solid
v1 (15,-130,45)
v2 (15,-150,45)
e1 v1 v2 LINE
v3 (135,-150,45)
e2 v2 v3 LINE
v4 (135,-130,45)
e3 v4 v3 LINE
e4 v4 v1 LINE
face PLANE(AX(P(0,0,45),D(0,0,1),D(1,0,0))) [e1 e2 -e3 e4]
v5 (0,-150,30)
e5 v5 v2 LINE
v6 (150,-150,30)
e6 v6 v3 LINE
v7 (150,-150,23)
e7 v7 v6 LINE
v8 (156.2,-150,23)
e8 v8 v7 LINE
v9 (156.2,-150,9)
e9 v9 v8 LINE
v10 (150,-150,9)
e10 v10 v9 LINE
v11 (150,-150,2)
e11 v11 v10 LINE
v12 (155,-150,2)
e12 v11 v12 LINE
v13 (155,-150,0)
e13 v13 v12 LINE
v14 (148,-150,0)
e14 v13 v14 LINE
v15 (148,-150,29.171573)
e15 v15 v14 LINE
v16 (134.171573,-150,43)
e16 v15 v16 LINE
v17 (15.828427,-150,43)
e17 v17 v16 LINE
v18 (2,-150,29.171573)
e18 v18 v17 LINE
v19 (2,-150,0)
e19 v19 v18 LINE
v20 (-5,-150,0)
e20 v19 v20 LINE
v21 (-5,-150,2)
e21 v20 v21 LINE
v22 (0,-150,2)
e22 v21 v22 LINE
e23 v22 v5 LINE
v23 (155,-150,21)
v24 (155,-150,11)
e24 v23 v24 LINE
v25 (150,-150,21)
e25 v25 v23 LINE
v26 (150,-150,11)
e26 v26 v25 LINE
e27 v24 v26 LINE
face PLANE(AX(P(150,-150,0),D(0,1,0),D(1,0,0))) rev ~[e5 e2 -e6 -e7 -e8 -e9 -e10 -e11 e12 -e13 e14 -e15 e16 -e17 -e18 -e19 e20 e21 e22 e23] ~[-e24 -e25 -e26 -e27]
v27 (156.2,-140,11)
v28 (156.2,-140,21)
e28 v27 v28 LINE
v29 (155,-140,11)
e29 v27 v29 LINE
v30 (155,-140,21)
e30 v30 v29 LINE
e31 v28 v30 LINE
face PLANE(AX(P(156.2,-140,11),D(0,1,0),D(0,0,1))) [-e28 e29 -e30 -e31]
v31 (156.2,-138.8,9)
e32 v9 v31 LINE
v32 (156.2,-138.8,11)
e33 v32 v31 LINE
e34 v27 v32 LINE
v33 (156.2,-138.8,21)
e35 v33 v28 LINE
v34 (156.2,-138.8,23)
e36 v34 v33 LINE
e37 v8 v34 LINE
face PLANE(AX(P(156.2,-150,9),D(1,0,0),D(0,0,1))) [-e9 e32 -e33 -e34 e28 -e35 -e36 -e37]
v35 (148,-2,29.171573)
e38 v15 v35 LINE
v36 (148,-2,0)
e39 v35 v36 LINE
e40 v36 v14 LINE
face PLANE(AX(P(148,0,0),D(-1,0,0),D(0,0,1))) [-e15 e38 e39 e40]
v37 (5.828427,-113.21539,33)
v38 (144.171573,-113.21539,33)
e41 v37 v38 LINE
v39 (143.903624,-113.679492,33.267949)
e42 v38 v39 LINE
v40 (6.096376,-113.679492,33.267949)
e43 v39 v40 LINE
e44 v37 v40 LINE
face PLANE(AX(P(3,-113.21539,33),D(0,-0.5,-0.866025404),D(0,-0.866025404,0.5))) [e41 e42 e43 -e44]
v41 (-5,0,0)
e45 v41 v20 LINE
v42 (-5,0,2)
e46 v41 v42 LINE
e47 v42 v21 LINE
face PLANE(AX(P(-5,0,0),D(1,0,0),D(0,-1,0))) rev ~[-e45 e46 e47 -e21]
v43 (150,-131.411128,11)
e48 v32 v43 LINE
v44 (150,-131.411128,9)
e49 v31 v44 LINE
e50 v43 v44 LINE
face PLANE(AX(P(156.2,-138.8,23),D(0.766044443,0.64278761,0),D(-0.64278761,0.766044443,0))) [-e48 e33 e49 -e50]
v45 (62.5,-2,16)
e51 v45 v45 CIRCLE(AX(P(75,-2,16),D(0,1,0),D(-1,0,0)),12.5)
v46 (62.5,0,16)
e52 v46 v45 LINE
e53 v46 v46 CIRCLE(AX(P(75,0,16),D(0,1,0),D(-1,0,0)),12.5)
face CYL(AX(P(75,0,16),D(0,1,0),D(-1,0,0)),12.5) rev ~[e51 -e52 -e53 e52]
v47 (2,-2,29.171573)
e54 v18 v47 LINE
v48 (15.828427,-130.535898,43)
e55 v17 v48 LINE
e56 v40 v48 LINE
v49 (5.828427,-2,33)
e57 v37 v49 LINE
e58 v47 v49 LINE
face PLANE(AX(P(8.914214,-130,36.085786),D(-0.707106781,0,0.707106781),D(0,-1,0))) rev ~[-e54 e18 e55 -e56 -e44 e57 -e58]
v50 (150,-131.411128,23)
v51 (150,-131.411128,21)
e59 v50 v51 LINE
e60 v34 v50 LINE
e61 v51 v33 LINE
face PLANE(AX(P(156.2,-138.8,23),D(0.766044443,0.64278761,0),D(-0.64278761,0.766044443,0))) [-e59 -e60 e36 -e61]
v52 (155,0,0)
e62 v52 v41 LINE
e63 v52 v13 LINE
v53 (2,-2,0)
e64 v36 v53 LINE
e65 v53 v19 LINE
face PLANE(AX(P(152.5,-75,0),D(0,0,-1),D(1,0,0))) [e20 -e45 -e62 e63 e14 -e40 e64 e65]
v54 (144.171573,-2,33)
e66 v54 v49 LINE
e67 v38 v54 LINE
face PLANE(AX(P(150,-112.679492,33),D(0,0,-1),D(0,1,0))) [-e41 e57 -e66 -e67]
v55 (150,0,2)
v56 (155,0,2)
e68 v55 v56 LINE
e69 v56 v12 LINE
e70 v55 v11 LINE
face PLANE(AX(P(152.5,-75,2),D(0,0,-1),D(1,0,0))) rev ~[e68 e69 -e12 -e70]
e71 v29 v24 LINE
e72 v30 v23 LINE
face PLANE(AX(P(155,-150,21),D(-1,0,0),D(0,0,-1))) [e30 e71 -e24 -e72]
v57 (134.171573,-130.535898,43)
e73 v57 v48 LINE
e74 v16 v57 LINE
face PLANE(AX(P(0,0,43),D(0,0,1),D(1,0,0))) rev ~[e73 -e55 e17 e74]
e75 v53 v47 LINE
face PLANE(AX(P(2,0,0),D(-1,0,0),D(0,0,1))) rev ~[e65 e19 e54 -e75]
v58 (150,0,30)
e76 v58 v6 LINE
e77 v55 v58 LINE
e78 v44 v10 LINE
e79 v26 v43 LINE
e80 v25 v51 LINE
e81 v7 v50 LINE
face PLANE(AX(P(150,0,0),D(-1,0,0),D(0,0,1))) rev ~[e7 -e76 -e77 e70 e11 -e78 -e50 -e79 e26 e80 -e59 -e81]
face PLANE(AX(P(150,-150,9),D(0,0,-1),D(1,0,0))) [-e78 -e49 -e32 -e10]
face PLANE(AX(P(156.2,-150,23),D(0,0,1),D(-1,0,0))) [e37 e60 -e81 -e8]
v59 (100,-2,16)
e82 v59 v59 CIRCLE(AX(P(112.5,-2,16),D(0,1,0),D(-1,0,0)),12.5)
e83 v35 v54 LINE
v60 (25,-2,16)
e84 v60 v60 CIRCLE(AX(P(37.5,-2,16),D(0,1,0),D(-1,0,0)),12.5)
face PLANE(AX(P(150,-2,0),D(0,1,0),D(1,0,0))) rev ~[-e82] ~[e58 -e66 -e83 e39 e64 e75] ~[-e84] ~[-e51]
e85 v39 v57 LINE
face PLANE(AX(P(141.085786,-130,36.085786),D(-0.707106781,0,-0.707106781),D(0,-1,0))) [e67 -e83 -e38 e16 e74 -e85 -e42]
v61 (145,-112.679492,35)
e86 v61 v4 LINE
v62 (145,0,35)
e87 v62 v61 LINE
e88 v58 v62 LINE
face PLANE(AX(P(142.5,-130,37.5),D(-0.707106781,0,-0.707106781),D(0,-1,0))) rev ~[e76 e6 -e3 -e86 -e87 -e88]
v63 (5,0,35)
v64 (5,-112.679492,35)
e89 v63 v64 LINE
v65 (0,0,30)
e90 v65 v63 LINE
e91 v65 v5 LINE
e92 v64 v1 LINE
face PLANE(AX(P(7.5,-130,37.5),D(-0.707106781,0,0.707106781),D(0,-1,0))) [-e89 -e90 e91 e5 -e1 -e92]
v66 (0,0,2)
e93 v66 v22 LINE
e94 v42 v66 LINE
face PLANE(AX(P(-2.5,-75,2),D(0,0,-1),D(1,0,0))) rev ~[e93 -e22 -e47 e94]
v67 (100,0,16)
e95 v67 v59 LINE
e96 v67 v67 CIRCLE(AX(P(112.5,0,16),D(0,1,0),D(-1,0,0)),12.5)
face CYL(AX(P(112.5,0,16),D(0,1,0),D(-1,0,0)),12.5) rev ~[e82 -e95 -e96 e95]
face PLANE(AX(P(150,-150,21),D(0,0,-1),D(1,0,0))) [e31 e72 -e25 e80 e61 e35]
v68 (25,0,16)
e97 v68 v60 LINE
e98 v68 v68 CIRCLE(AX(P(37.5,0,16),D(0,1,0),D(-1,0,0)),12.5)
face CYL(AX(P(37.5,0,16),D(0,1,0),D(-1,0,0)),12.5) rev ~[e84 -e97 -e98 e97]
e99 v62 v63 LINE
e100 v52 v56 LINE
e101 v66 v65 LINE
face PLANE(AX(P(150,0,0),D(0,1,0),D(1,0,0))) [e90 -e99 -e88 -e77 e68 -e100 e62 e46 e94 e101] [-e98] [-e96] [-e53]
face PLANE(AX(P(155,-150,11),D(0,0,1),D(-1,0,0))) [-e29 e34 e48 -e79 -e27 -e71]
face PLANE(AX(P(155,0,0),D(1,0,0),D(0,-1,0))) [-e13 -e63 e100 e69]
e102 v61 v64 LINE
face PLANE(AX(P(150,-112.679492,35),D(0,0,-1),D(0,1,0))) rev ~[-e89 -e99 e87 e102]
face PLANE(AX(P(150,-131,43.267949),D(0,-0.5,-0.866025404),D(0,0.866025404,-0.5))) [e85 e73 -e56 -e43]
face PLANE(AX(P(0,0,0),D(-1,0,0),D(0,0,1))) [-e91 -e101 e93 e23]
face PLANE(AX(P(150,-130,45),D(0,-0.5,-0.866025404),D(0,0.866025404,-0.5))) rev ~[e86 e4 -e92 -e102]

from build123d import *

# Parameters (mm, degrees)
F0_W        = 150
F0_H        = 45
F1_DEPTH    = 150
F2_W        = 5
F2_H        = 150
F3_DEPTH    = 2
F5_DEPTH    = 150
F6_SIZE     = 15
F7_T        = 2
F7_T3_DEPTH = 154
F7_T5_DEPTH = 144
F8_R        = 12.5
F9_DEPTH    = 25
F11_DEPTH   = 10
F13_DEPTH   = 14
F14_W       = 5
F14_H       = 10
F15_DEPTH   = 25
F16_W       = 1.2
F16_H       = 10
F16_W_2     = 1.4301043111
F17_DEPTH   = 6.2


# Not quite as in the source:
# - a shell that OpenCascade refuses in one call is made with other operations: the cavity is built on its own and cut out


with BuildPart() as f1:
    # F0 (on Front) → F1 (new body)
    with BuildSketch(Plane.XZ):
        with Locations((75, 22.5)):
            Rectangle(F0_W, F0_H)
    extrude(amount=F1_DEPTH)

    # F2 (on face) → F3 (join)
    with BuildSketch(Plane(origin=(0, 0, 0), x_dir=(1, 0, 0), z_dir=(0, 0, -1))):
        with Locations((152.5, 75)):
            Rectangle(F2_W, F2_H)
        with Locations((-2.5, 75)):
            Rectangle(F2_W, F2_H)
    extrude(amount=-F3_DEPTH)

    # F4 (on face) → F5 (cut, through all)
    with BuildSketch(Plane.YZ.offset(150)):
        Polygon((0, 35), (0, 45), (-130, 45), (-112.6794919243, 35), align=None)
    extrude(amount=-F5_DEPTH, mode=Mode.SUBTRACT)

    # F6
    f6_edges = [f1.edges().sort_by_distance(p)[0] for p in [
        (0, -140, 45),
        (150, -140, 45),
    ]]
    chamfer(f6_edges, length=F6_SIZE)

    # F7: shell of thickness 2, made by hand


with BuildPart() as f7_core1:
    # F7_t2: copy of F1
    add(f1.part)

    # the walls: a layer under each face that stays
    f7_faces = [f7_core1.faces().sort_by_distance(p)[0] for p in [
        (0, -75, 16),
        (75, 0, 17.5),
        (2.5, -25, 32.5),
        (-2.5, -75, 2),
        (75, -56.3397459622, 35),
        (147.5, -25, 32.5),
        (150, -75, 16),
        (152.5, -75, 2),
        (155, -75, 1),
        (-5, -75, 1),
        (75, -121.3397459622, 40),
        (75, -140, 45),
    ]]
    thicken(f7_faces, amount=-F7_T, mode=Mode.SUBTRACT)

    # F7_s4 → F7_t3 (cut)
    with BuildSketch(Plane.XZ.offset(-2)):
        Polygon((-0.02, 2.02), (2, 2), (2, 0), (0, 0), align=None)
        Polygon((150.02, 2.02), (148, 2), (148, 0), (150, 0), align=None)
    extrude(amount=F7_T3_DEPTH, mode=Mode.SUBTRACT)

    # F7_s6 → F7_t5 (cut)
    with BuildSketch(Plane.YZ.offset(3)):
        Polygon((-112.6694919243, 35.0373205081), (-112.6794919243, 33), (-113.2153903092, 33), (-113.6794919243, 33.2679491924), align=None)
    extrude(amount=F7_T5_DEPTH, mode=Mode.SUBTRACT)


with BuildPart() as f1_1:
    add(f1.part)

    # what is left inside the walls is the cavity
    f7_cavity = [f7_core1.part.solids().sort_by_distance(p)[0] for p in [
        (75, -100.666667, 0.02),
    ]]
    add(f7_cavity, mode=Mode.SUBTRACT)

    # F8 (on face) → F9 (cut)
    with BuildSketch(Plane(origin=(0, 0, 0), x_dir=(-1, 0, 0), z_dir=(0, 1, 0))):
        with Locations((-112.5, 16)):
            Circle(F8_R)
        with Locations((-75, 16)):
            Circle(F8_R)
        with Locations((-37.5, 16)):
            Circle(F8_R)
    extrude(amount=-F9_DEPTH, mode=Mode.SUBTRACT)

    # F10 (on face) → F11 (join)
    with BuildSketch(Plane.XZ.offset(150)):
        Polygon((156.2, 9), (156.2, 23), (150, 23), (150, 21), (155, 21), (155, 11), (150, 11), (150, 9), align=None)
    extrude(amount=-F11_DEPTH)

    # F12 (on face) → F13 (join, through all)
    with BuildSketch(Plane.XY.offset(23)):
        Polygon((150, -140), (156.2, -140), (156.2, -138.8), (150, -131.4111277259), align=None)
    extrude(amount=-F13_DEPTH)

    # F14 (on face) → F15 (cut)
    with BuildSketch(Plane.XZ.offset(150)):
        with Locations((152.5, 16)):
            Rectangle(F14_W, F14_H)
    extrude(amount=-F15_DEPTH, mode=Mode.SUBTRACT)

    # F16 (on face) → F17 (cut, through all)
    with BuildSketch(Plane.YZ.offset(156.2)):
        with Locations((-139.4, 16)):
            Rectangle(F16_W, F16_H)
        with Locations((-138.0849478444, 16)):
            Rectangle(F16_W_2, F16_H)
    extrude(amount=-F17_DEPTH, mode=Mode.SUBTRACT)


solid = f1_1.part
